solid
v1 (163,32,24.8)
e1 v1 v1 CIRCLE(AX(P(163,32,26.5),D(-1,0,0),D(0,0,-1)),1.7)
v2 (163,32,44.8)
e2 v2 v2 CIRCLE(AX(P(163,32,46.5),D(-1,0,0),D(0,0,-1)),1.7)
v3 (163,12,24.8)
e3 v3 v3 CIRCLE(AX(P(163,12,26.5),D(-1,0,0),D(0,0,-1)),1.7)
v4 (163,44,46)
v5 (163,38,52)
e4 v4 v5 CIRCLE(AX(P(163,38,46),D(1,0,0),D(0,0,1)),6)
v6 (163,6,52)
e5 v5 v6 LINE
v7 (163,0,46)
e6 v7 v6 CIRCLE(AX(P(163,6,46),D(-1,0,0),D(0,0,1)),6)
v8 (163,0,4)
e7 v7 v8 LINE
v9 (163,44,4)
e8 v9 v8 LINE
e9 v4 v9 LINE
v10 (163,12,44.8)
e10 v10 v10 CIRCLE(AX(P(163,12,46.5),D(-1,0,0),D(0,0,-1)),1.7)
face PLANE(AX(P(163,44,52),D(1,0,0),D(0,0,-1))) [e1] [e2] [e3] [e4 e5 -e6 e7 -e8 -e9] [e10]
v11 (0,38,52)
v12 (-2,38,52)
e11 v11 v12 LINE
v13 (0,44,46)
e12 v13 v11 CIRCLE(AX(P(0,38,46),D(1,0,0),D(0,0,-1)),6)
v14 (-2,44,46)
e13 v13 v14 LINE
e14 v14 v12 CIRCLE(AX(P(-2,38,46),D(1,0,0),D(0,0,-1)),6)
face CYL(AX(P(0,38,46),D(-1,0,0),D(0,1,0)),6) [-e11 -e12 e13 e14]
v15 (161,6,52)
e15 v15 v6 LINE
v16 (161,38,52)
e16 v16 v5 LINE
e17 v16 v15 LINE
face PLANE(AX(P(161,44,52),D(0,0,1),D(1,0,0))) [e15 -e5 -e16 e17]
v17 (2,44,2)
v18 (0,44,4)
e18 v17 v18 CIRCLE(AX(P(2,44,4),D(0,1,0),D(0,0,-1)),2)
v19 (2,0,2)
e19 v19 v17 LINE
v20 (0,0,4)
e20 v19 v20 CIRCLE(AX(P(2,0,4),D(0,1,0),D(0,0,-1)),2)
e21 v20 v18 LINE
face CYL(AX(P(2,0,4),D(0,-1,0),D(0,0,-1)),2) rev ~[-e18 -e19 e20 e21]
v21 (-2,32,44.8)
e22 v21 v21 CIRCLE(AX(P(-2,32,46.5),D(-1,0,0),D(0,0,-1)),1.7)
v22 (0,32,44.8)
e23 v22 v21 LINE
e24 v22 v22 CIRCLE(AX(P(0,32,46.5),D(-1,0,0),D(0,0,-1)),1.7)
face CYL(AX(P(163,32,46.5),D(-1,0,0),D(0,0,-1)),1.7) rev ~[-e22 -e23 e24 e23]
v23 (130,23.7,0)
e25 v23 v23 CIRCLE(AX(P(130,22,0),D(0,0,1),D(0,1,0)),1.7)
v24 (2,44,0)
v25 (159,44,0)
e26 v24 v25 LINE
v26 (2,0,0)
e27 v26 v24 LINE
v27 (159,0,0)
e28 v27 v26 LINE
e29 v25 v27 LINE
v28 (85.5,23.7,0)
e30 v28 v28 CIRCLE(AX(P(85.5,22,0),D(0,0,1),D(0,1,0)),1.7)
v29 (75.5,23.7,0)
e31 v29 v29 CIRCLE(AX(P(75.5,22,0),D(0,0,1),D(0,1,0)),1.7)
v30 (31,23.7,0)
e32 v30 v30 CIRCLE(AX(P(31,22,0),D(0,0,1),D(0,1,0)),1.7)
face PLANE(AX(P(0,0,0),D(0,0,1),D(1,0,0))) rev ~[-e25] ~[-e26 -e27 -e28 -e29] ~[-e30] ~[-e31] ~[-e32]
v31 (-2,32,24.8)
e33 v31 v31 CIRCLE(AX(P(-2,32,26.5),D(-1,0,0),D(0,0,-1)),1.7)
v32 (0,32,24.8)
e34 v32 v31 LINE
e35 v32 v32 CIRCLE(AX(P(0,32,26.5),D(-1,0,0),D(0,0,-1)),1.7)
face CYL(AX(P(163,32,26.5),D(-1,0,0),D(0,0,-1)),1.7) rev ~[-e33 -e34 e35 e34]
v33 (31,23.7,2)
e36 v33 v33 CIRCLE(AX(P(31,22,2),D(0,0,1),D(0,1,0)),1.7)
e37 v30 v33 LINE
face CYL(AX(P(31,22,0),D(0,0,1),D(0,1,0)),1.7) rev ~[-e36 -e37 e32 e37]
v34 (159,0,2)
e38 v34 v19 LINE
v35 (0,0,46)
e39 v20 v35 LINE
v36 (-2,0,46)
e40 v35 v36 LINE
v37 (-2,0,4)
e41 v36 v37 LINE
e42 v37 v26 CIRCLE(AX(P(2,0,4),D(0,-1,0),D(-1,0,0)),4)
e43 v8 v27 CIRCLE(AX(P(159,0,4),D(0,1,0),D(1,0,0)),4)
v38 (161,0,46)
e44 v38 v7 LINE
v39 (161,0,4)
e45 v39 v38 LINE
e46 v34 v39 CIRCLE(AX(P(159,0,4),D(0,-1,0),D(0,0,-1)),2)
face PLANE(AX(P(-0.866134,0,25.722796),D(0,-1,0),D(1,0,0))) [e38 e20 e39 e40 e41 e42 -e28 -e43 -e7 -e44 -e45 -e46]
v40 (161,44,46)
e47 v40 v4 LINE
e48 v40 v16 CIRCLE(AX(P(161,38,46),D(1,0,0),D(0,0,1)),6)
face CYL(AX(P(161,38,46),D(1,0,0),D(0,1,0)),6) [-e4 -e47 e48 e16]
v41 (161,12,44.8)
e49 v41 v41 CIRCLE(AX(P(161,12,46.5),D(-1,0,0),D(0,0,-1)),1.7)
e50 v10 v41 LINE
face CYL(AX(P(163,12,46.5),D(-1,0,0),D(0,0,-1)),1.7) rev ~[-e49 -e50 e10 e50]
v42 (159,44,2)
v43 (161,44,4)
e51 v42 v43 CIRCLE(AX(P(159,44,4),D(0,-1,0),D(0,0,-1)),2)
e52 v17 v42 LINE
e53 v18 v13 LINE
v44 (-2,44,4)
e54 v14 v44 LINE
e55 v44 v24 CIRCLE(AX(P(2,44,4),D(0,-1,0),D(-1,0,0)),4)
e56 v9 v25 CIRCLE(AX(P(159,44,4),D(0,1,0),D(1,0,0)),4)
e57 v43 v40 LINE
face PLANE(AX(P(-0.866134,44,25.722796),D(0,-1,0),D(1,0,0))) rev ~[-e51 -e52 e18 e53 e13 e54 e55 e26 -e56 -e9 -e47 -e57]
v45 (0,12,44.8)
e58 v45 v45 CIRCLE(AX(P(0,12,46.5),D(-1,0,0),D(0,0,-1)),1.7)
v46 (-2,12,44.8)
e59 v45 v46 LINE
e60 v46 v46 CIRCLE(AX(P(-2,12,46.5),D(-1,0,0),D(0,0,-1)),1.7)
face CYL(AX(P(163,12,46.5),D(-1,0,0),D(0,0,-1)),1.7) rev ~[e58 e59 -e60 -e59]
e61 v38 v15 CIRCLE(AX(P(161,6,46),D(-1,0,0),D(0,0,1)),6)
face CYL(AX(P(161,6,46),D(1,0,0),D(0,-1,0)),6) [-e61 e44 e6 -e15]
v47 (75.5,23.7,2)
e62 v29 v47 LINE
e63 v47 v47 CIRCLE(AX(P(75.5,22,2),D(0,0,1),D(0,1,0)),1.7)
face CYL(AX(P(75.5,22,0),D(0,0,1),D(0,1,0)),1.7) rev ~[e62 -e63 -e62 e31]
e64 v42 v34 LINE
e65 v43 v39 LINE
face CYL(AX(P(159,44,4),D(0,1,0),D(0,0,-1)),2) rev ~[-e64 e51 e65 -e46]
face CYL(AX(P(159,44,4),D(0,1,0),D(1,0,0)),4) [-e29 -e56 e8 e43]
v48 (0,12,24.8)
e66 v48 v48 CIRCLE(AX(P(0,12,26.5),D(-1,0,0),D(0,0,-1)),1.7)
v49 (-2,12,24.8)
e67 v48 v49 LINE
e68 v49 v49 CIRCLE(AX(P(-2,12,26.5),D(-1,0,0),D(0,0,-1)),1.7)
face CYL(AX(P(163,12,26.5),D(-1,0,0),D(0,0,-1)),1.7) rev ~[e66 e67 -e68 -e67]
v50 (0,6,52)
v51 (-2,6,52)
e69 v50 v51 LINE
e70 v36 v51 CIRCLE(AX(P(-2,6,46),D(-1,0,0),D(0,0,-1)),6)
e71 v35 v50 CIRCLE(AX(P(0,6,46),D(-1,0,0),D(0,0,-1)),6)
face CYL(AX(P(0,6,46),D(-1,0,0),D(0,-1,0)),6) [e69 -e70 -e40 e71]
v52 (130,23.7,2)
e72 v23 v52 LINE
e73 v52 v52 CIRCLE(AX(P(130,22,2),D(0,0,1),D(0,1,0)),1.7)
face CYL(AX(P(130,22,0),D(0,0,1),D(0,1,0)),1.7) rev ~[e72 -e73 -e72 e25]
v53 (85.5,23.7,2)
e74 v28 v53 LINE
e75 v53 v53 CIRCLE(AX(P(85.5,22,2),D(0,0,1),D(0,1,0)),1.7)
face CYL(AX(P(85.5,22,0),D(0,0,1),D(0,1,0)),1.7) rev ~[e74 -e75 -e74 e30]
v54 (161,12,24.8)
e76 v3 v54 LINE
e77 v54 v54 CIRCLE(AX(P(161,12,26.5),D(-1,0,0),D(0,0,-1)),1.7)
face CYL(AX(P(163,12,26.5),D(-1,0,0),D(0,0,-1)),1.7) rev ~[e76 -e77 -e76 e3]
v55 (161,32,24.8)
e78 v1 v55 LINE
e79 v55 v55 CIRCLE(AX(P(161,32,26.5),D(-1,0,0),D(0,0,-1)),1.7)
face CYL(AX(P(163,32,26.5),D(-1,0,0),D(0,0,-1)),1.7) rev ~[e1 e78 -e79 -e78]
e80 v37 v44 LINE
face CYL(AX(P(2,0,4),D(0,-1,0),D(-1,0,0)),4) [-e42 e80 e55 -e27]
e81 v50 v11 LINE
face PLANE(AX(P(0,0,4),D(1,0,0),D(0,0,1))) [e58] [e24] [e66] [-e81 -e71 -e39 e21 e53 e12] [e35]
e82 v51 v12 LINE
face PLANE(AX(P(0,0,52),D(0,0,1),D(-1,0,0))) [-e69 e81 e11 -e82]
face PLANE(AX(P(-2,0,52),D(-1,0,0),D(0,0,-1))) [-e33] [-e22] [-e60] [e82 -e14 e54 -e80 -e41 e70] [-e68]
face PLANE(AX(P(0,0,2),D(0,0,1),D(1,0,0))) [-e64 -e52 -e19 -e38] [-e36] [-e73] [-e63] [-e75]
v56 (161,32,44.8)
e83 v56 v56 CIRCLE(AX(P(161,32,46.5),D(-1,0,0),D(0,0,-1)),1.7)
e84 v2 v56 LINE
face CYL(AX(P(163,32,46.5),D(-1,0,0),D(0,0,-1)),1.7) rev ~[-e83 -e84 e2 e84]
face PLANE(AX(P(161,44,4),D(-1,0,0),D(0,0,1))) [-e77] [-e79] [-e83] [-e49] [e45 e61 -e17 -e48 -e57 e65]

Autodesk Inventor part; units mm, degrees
ref_plane "YZ Plane" through (0, 0, 0) normal (1, 0, 0) x (0, 1, 0)
ref_plane "XZ Plane" through (0, 0, 0) normal (0, 1, 0) x (-1, 0, 0)
ref_plane "XY Plane" through (0, 0, 0) normal (0, 0, 1) x (1, 0, 0)
sketch "Sketch1" plane through (0, 0, 0) normal (0, 0, 1) x (1, 0, 0)
  line L0 (0, 44) -> (161, 44)
  line L1 (161, 44) -> (161, 0)
  line L2 (161, 0) -> (0, 0)
  line L3 (0, 0) -> (0, 44)
  dimension "d0" = 161
  dimension "d1" = 44
extrude "Plate1" add sketch "Sketch1" along normal blind 2
sketch "Sketch2" plane through (0, 0, 2) normal (-1, 0, 0) x (0, -1, 0)
  line L0 (-44, 0) -> (0, 0)
  line L1 (0, 0) -> (0, 50)
  line L2 (0, 50) -> (-44, 50)
  line L3 (-44, 50) -> (-44, 0)
edge flange "Flange1" height 52 angle 90 thickness 2 bend radius 2 thickness toward (-1, 0, 0) relief tear relief width 2 relief depth 1 corner gap 2 corner form 0 edges at (0, 22, 2) (161, 22, 2) wall of the first edge with corners at (0, 44, 2) (0, 0, 2) (0, 0, 52) (0, 44, 52)
bend "Bend1"
corner "Corner1"
sketch "Sketch3" plane through (163, 0, 52) normal (1, 0, 0) x (0, 0, -1)
  line L0 (0, 0) -> (0, 44) construction
  line L1 (5.5, 32) -> (5.5, 12) construction
  point P0 (52, 0)
  point P1 (25.5, 32)
  point P2 (25.5, 12)
  point P3 (0, 22)
  point P4 (5.5, 22)
  dimension "d13" = 20
  dimension "d14" = 20
  dimension "d15" = 5.5
hole "Hole1" at (163, 32, 46.5) at (163, 32, 26.5) at (163, 12, 46.5) at (163, 12, 26.5) direction (-1, 0, 0) diameter 3.4 end through all clearance for "Flat Head Machine Screw" size "M3" standard "Ansi Metric M Profile"
fillet "Corner Round1" radius 6 4 edges at (-1, 0, 52) (-1, 44, 52) (162, 0, 52) (162, 44, 52)
sketch "Sketch4" plane through (0, 0, 0) normal (0, 0, -1) x (-1, 0, 0)
  line L0 (-163, 0) -> (-163, 44) projected
  line L1 (2, 44) -> (2, 0) projected
  point P0 (0, 0)
  point P1 (-130, 22)
  point P2 (-85.5, 22)
  point P3 (-75.5, 22)
  point P4 (-31, 22)
  point P5 (-163, 22)
  dimension "d24" = 10
  dimension "d25" = 33
  dimension "d26" = 33
  dimension "d27" = 44.5
  dimension "d28" = 44.5
hole "Hole2" at (130, 22, 0) at (85.5, 22, 0) at (75.5, 22, 0) at (31, 22, 0) direction (0, 0, 1) diameter 3.4 end through all clearance for "Flat Head Machine Screw" size "M3" standard "Ansi Metric M Profile"
equation "\"d21\" = Thickness"
equation "\"d2\" = Thickness"
equation "\"d3\" = BendReliefWidth"
equation "\"d4\" = BendReliefDepth"
equation "\"d5\" = MinimumRemnant"
equation "\"d6\" = TransitionRadius"
equation "\"d9\" = BendRadius"
equation "\"d10\" = CornerReliefSize"
equation "\"d11\" = GapSize"
equation "\"d12\" = JacobiRadiusSize"
equation "\"d26\" = d25"
equation "\"d28\" = d27"
equation "\"BendRadius\" = Thickness"
equation "\"BendReliefWidth\" = Thickness"
equation "\"BendReliefDepth\" = 0.5 * Thickness"
equation "\"CornerReliefSize\" = 4 * Thickness"
equation "\"MinimumRemnant\" = 2 * Thickness"
equation "\"TransitionRadius\" = BendRadius"
equation "\"JacobiRadiusSize\" = BendRadius"
equation "\"GapSize\" = Thickness"
equation "\"Thickness\" = 2"
properties part number "NEW Z Bracket"
